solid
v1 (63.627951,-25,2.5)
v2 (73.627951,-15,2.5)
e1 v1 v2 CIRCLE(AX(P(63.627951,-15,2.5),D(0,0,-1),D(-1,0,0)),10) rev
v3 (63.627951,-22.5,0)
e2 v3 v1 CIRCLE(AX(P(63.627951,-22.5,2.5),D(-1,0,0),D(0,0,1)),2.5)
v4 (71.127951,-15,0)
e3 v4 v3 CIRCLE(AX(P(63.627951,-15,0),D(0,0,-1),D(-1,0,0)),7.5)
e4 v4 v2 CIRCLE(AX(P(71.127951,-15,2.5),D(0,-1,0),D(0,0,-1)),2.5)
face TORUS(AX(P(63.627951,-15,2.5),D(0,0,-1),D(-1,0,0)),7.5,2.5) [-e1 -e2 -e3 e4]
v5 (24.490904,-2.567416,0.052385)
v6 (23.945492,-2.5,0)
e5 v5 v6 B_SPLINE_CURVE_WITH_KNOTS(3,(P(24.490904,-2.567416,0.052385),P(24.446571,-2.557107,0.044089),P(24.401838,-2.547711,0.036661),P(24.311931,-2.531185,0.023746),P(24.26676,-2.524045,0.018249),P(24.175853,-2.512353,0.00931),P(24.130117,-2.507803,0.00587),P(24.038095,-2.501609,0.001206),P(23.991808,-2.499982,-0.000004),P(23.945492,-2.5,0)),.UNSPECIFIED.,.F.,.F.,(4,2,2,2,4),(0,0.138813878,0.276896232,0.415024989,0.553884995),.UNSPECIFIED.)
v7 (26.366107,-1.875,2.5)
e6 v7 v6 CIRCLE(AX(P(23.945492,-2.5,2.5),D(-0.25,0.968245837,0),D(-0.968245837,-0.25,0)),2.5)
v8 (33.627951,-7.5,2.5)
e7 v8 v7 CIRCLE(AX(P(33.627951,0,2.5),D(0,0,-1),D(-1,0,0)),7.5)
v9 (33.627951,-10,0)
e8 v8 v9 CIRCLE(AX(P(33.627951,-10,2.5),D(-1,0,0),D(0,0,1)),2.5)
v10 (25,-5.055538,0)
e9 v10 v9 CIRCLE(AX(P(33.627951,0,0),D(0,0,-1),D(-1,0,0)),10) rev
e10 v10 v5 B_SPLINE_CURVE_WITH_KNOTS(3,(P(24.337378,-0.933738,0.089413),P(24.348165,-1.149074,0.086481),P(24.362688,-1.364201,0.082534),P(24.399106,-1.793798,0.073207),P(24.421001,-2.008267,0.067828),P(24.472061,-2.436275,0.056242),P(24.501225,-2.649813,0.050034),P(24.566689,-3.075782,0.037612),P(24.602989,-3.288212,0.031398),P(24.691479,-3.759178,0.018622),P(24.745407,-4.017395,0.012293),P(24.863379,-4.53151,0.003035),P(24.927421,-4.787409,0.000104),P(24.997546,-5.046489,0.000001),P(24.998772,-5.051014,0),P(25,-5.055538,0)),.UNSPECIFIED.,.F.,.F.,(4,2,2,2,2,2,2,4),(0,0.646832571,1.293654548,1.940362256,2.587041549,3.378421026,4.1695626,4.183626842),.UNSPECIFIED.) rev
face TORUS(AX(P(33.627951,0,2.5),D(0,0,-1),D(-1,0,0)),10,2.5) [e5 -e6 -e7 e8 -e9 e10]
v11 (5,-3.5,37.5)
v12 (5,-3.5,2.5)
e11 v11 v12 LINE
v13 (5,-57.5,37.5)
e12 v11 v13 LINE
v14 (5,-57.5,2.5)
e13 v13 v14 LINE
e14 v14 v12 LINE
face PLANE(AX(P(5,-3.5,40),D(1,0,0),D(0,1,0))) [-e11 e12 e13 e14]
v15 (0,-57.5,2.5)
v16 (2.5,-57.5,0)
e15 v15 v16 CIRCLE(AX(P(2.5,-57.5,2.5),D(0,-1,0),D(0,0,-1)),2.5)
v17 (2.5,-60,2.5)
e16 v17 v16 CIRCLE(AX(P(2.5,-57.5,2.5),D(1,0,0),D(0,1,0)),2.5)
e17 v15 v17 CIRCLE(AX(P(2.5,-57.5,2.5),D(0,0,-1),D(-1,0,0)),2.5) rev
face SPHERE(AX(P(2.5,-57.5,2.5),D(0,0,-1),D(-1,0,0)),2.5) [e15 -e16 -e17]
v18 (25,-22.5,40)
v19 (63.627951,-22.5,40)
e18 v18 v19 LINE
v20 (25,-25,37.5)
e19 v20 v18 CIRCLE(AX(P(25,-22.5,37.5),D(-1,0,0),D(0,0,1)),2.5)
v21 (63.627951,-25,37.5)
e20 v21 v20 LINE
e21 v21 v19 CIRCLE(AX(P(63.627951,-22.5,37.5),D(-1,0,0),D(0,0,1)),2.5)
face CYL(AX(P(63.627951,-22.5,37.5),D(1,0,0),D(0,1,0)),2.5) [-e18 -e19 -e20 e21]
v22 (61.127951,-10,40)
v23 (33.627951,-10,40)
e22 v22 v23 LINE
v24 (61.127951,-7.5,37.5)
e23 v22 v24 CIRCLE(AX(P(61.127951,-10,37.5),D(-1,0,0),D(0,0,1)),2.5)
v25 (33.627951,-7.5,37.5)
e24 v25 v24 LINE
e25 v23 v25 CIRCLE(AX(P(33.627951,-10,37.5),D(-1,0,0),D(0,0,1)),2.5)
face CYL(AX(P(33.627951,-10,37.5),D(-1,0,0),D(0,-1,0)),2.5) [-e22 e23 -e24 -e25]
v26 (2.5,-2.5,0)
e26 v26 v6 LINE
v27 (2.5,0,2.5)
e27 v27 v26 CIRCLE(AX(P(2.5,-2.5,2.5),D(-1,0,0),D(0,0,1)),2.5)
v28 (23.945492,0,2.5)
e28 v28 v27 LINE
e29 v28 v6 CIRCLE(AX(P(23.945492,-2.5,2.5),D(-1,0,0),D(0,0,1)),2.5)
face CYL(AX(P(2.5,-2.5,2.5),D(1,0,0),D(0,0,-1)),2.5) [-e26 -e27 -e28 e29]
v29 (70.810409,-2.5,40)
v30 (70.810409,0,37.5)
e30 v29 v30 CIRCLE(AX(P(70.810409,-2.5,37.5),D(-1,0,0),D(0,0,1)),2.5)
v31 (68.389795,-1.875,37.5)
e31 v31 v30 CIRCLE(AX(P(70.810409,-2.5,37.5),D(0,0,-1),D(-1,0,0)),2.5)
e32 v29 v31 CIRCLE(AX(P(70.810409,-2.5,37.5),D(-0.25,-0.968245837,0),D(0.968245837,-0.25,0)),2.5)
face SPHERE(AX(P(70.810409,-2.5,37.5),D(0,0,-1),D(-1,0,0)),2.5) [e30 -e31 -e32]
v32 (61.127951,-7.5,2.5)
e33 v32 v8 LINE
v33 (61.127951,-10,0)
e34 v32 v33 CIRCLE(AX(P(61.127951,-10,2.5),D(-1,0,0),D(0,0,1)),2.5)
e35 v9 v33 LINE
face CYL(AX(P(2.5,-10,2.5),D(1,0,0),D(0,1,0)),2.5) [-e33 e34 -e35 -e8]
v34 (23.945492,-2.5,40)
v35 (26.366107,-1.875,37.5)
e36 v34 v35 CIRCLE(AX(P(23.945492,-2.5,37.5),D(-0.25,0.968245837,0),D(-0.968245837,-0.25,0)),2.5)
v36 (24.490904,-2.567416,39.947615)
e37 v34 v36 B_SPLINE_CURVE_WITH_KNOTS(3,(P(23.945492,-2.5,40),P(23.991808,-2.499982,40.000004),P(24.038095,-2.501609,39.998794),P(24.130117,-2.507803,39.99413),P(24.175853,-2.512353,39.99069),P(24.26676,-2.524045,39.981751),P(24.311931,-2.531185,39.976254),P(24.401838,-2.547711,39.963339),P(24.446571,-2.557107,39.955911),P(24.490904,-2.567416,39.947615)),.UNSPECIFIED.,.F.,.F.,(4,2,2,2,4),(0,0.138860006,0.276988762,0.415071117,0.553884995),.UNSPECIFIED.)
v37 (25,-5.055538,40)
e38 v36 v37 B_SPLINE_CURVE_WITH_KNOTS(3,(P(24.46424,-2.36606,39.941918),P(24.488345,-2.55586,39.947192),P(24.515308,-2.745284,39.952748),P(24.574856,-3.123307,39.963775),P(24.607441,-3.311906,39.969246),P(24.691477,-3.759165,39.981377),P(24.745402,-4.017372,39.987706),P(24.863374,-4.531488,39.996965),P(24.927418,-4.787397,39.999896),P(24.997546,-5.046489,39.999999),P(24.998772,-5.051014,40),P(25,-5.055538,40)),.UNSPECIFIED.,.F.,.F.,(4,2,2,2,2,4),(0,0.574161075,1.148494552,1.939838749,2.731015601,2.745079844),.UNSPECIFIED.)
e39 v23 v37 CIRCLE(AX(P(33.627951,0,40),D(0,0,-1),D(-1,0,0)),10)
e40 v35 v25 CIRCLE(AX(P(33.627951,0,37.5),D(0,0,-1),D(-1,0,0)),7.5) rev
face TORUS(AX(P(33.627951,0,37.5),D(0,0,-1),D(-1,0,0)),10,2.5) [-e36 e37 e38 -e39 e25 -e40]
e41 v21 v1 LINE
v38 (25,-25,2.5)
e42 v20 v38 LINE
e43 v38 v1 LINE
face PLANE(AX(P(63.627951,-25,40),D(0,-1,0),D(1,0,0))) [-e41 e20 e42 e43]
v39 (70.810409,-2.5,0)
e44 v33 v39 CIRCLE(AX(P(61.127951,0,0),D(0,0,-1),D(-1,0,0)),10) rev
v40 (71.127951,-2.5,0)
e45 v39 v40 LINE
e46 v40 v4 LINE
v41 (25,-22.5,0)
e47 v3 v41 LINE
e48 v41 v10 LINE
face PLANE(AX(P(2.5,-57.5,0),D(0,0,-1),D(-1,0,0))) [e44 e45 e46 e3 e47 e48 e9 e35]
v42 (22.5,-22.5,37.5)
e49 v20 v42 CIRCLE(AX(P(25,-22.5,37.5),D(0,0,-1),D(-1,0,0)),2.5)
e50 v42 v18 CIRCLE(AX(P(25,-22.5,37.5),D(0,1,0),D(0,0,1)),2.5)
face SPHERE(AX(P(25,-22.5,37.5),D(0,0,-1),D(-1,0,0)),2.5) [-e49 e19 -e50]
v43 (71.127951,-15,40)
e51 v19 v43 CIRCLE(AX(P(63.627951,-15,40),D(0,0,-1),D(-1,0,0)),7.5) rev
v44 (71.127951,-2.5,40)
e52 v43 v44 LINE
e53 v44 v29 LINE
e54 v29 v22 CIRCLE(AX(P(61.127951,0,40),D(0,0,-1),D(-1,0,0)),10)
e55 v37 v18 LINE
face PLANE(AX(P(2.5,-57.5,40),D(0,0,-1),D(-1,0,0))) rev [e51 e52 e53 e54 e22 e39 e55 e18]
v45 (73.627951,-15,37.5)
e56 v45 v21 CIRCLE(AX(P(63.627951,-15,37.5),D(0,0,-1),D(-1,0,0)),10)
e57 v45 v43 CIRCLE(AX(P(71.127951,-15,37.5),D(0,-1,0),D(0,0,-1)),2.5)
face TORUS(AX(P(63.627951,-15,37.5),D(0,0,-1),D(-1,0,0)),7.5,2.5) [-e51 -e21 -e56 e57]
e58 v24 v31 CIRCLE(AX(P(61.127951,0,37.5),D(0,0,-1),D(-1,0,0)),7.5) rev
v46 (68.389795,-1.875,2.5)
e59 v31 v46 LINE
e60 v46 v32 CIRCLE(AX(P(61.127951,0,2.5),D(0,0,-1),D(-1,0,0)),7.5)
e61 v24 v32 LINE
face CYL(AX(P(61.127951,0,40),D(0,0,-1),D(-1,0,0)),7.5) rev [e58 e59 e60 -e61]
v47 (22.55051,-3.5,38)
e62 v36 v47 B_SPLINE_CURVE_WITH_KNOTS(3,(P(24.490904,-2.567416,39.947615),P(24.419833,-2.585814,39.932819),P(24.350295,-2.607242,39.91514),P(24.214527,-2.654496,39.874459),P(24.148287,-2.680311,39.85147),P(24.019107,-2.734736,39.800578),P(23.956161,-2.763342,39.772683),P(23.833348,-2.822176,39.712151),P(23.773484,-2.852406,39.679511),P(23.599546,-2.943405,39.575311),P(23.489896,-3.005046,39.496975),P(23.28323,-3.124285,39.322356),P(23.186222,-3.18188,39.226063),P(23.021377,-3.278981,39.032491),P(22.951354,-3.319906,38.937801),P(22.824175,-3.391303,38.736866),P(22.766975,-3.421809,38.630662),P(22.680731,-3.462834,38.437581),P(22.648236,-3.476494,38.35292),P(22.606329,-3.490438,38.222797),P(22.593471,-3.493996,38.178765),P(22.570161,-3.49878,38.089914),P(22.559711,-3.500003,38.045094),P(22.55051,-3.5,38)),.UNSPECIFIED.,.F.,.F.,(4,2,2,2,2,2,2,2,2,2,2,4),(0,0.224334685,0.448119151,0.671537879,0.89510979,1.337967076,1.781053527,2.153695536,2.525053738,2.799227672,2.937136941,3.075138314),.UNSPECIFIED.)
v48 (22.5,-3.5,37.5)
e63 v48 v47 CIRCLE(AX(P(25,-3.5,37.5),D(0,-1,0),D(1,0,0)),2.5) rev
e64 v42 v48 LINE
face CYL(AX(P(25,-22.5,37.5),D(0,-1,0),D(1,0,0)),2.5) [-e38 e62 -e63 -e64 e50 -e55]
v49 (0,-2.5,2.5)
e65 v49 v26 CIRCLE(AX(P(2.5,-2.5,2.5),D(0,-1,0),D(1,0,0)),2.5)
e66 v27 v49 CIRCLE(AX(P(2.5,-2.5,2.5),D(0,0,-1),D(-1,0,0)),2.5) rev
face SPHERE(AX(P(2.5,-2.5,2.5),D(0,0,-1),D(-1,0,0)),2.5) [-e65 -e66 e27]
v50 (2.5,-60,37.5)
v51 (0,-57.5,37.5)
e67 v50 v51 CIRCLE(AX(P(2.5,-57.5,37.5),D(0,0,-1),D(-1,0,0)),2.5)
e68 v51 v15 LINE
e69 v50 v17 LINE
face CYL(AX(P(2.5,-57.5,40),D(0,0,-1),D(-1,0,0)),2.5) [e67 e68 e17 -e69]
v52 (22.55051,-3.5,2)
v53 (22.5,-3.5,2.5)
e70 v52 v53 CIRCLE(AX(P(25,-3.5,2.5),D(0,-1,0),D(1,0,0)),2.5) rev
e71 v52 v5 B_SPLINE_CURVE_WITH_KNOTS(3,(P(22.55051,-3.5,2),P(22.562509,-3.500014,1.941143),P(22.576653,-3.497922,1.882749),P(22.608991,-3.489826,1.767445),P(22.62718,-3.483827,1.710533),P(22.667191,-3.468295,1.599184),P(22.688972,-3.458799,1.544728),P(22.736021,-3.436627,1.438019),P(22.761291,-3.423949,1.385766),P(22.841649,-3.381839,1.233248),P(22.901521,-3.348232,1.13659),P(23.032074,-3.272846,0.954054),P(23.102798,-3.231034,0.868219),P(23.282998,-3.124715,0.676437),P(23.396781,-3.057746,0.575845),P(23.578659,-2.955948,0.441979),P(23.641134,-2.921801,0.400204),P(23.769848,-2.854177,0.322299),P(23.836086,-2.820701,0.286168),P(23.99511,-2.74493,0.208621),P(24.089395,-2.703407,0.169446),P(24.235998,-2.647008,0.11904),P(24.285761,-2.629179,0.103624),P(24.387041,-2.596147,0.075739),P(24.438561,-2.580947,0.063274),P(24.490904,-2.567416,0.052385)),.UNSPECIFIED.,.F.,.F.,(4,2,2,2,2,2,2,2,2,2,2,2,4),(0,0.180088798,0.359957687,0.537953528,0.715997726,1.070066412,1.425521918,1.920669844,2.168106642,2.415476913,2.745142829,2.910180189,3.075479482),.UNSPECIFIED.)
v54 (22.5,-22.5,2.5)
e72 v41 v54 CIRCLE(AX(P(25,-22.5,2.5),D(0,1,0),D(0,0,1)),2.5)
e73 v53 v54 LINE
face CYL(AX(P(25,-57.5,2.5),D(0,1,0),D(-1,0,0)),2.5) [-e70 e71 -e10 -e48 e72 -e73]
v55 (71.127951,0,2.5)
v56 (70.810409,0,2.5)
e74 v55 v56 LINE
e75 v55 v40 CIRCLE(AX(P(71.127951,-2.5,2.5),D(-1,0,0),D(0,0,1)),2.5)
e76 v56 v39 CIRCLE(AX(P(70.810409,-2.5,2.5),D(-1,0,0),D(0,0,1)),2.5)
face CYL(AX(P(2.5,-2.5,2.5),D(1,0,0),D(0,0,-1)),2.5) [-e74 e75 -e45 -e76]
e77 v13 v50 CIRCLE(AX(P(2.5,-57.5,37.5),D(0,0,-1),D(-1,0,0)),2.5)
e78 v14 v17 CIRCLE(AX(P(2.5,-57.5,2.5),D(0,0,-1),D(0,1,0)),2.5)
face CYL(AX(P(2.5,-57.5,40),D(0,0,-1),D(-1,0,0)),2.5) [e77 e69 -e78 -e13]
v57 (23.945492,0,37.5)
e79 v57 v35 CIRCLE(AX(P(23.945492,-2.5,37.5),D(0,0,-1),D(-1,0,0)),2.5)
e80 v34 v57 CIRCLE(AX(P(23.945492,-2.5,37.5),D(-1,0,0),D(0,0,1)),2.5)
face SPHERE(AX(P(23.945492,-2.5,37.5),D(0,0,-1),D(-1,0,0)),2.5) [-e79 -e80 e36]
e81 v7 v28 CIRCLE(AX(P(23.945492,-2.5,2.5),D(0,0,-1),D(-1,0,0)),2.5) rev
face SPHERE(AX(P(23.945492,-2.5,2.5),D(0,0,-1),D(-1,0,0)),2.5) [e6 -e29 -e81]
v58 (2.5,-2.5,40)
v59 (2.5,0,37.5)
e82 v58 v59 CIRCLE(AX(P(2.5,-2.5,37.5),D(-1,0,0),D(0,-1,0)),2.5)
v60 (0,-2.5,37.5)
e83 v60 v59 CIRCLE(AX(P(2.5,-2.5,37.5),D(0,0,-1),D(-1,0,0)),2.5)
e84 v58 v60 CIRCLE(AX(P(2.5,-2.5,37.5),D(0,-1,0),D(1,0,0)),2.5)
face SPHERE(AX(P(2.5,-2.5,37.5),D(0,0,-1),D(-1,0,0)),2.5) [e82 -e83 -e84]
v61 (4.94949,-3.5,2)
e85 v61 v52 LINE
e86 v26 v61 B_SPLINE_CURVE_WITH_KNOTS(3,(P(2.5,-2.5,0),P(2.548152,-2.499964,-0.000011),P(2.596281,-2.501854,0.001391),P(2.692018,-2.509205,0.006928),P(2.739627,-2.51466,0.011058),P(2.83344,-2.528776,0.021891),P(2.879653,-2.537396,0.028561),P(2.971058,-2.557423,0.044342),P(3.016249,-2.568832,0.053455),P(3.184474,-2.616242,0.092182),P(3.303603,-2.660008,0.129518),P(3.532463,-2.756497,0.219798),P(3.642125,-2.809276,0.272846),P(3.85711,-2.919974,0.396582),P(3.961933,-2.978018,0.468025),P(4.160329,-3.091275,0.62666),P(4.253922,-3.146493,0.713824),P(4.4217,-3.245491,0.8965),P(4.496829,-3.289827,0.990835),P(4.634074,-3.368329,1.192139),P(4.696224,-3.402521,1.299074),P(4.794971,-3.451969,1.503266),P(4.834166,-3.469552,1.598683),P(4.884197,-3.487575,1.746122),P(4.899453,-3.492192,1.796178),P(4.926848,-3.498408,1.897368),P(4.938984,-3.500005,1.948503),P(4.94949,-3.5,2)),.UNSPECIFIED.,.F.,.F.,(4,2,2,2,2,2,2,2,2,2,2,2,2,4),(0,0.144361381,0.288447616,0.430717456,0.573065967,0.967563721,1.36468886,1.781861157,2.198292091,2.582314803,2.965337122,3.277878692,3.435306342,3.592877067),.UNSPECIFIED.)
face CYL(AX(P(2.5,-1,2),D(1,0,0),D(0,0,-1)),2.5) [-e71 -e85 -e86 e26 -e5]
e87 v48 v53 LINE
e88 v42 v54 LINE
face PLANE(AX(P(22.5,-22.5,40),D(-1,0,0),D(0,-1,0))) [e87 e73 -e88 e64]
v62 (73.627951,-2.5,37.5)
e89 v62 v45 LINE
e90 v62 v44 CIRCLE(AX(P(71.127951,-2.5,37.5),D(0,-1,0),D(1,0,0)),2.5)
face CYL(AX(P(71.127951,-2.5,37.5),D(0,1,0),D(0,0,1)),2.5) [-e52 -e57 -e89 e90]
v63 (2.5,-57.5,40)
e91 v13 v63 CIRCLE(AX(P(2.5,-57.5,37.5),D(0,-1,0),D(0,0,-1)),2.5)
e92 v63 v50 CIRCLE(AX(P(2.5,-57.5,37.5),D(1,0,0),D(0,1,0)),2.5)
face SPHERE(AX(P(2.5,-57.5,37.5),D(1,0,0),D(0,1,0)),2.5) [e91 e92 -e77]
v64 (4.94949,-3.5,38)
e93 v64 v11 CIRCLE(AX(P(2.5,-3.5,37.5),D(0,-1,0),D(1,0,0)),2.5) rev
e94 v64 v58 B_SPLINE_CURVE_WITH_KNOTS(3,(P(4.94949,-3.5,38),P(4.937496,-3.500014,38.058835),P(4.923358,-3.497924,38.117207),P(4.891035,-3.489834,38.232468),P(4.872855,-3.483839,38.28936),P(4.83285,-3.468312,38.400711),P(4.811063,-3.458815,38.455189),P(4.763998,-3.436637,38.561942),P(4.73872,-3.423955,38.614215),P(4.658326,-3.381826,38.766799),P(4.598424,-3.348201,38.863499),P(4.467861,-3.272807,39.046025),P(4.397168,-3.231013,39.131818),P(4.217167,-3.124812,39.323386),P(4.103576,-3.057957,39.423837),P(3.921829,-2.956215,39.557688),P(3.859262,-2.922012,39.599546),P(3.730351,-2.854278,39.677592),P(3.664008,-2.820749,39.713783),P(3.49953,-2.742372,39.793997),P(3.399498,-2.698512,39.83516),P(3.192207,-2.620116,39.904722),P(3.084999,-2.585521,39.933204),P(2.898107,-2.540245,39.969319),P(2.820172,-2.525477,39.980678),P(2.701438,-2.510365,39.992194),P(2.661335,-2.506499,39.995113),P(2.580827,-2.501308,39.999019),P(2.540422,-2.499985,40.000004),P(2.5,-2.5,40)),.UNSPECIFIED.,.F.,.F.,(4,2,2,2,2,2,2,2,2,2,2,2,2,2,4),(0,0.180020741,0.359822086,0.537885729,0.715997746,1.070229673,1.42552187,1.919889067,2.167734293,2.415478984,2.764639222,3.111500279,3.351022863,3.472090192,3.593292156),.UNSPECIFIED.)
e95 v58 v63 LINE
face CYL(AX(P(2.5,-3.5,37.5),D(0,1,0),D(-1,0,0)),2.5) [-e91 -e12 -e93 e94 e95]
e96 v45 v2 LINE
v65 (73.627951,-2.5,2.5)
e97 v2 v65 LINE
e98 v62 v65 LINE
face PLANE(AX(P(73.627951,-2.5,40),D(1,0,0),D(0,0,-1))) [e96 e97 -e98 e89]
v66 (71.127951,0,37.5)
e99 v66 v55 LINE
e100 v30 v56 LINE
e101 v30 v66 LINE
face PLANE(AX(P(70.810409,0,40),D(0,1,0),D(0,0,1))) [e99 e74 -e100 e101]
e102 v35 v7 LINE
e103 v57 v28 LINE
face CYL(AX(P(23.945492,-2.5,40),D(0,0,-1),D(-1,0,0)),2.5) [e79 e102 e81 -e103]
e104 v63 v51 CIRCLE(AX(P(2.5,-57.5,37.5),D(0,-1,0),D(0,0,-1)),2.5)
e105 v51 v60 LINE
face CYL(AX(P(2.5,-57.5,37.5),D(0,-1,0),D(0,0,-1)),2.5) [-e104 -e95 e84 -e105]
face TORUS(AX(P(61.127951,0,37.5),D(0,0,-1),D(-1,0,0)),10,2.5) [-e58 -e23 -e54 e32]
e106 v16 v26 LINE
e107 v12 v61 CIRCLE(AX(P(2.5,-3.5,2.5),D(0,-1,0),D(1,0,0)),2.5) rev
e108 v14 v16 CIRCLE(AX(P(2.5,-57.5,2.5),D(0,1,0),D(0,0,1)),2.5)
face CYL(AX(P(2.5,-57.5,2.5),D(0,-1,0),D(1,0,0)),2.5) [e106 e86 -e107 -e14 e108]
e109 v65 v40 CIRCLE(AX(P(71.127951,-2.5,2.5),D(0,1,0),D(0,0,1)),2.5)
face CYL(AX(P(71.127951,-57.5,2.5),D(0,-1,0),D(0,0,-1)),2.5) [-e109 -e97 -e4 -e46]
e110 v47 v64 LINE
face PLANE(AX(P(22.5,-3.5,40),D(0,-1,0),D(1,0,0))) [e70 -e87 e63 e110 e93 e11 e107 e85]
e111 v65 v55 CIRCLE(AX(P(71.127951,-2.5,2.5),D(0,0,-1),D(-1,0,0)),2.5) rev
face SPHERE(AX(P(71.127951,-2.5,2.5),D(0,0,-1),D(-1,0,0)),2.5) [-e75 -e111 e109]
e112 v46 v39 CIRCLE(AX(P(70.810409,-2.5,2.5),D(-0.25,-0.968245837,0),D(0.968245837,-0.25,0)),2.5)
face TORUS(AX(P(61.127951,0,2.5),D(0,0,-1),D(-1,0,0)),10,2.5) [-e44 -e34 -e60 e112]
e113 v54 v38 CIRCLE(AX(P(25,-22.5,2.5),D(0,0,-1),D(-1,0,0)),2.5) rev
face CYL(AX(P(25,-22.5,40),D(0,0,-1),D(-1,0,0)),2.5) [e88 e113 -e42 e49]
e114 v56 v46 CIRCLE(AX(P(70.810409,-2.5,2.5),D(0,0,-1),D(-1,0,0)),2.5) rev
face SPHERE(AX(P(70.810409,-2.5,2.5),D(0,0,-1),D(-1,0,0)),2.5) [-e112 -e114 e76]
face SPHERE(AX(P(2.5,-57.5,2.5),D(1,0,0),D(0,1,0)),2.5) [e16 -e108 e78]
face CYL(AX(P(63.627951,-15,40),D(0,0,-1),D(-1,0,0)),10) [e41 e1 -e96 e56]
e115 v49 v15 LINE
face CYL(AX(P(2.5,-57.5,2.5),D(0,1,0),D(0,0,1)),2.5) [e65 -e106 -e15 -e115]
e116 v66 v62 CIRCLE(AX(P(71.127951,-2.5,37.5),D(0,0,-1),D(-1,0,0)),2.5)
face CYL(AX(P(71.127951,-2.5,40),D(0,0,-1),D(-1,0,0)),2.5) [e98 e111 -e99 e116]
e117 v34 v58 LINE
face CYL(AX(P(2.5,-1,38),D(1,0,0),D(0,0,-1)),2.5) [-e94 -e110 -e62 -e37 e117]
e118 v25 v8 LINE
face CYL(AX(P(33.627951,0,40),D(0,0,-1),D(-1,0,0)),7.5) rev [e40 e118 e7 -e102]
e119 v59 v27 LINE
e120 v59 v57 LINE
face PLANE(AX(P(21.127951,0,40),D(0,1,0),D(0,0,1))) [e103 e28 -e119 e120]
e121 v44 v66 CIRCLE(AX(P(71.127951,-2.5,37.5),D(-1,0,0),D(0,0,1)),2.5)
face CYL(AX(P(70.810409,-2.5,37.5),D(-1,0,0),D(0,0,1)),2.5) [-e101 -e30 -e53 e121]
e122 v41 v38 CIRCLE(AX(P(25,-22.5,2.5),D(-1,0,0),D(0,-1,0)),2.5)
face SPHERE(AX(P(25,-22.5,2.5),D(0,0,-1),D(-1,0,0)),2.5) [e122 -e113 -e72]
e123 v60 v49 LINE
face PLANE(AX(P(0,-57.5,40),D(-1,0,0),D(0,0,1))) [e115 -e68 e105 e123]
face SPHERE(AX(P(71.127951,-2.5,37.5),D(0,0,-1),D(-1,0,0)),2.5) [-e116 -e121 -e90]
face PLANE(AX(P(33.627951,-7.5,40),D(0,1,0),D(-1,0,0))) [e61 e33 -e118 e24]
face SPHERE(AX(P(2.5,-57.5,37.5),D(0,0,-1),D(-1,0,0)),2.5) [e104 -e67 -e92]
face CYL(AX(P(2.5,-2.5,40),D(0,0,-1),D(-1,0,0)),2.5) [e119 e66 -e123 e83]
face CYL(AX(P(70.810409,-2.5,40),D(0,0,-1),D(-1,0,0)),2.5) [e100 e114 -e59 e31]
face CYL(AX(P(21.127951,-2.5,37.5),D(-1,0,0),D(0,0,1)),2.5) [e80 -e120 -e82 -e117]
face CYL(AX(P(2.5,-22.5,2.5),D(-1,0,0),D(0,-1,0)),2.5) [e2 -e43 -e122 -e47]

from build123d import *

# Parameters (mm, degrees)
BOSS_EXTRUDE1_DEPTH = 40
FILLET1_R           = 2.5
FILLET2_R           = 2.5
FILLET3_R           = 2.5


with BuildPart() as part:
    # Sketch1 → Boss-Extrude1 (new body)
    with BuildSketch(Plane.XY):
        with BuildLine():
            Line((2.5000000000000173, 0), (21.127950813884276, 0))
            Line((21.127950813884276, 0), (23.945492448365734, 0))
            ThreePointArc((23.945492448365734, 0), (25.47642353760522, -0.5235764623947627), (26.36610703974537, -1.8749999999999996))
            ThreePointArc((26.36610703974537, -1.8749999999999996), (29.035157546165816, -5.92927061281571), (33.627950813884276, -7.5))
            Line((33.627950813884276, -7.5), (61.1279508138843, -7.499999999999999))
            ThreePointArc((61.1279508138843, -7.499999999999999), (65.72074408160276, -5.92927061281571), (68.38979458802321, -1.874999999999998))
            ThreePointArc((68.38979458802321, -1.874999999999998), (69.27947809016335, -0.5235764623947716), (70.81040917940282, 0))
            Line((70.81040917940282, 0), (71.12795081388428, 0))
            ThreePointArc((71.12795081388428, 0), (72.89571776685065, -0.7322330470336298), (73.6279508138843, -2.499999999999995))
            Line((73.6279508138843, -2.499999999999995), (73.6279508138843, -15.000000000000004))
            ThreePointArc((73.6279508138843, -15.000000000000004), (70.69901862574977, -22.07106781186548), (63.6279508138843, -25.000000000000004))
            Line((63.6279508138843, -25.000000000000004), (25.00000000000001, -25.000000000000007))
            ThreePointArc((25.00000000000001, -25.000000000000007), (23.232233047033624, -24.267766952966376), (22.499999999999993, -22.49999999999999))
            Line((22.499999999999993, -22.49999999999999), (22.500000000000004, -3.4999999999999987))
            Line((22.500000000000004, -3.4999999999999987), (4.999999999999997, -3.499999999999996))
            Line((4.999999999999997, -3.499999999999996), (4.999999999999999, -60))
            Line((4.999999999999999, -60), (2.5000000000000178, -60))
            ThreePointArc((2.5000000000000178, -60), (0.7322330470336276, -59.26776695296637), (0, -57.49999999999998))
            Line((0, -57.49999999999998), (0, -2.5000000000000178))
            ThreePointArc((0, -2.5000000000000178), (0.7322330470336309, -0.7322330470336311), (2.5000000000000173, 0))
        make_face()
    extrude(amount=BOSS_EXTRUDE1_DEPTH)

    # Fillet1
    # the kernel refuses this fillet: 2.5 mm, written as the material it takes off along each edge
    with BuildSketch(Plane(origin=(11.25, -60, 40), x_dir=(0, 1, 0), z_dir=(-1, 0, 0))) as fillet1_piece_1:
        with BuildLine():
            CenterArc((FILLET1_R, FILLET1_R), FILLET1_R, 180, 90)
            Line((0, FILLET1_R), (0, 0))
            Line((0, 0), (FILLET1_R, 0))
        make_face()
    extrude(amount=8.749999999999982, mode=Mode.SUBTRACT)
    with BuildSketch(Plane(origin=(24.99999999999999, -22.50000000000001, 0), x_dir=(8.53e-15, -1, 0), z_dir=(1, 8.53e-15, 0))) as fillet1_piece_2:
        with BuildLine():
            CenterArc((2.4999999999999964 - FILLET1_R, -FILLET1_R), FILLET1_R, 0, 90)
            Line((2.4999999999999964 - FILLET1_R, 4.4e-16), (2.4999999999999964, 0))
            Line((2.4999999999999964, 0), (2.4999999999999964, -FILLET1_R))
        make_face()
    revolve(axis=Axis((24.99999999999999, -22.50000000000001, 0), (0, 0, -1)), revolution_arc=90.00000000000098, mode=Mode.SUBTRACT)
    with BuildSketch(Plane(origin=(63.6279508138843, -25.000000000000004, 0), x_dir=(0, 0, 1), z_dir=(-1, -9e-17, 0))) as fillet1_piece_3:
        with BuildLine():
            CenterArc((FILLET1_R, FILLET1_R), FILLET1_R, 180, 90)
            Line((-4.4e-16, FILLET1_R), (0, 0))
            Line((0, 0), (FILLET1_R, 0))
        make_face()
    extrude(amount=38.62795081388428, mode=Mode.SUBTRACT)
    with BuildSketch(Plane(origin=(63.6279508138843, -15.000000000000005, 0), x_dir=(1, 1.8e-16, 0), z_dir=(-1.8e-16, 1, 0))) as fillet1_piece_4:
        with BuildLine():
            CenterArc((10 - FILLET1_R, -FILLET1_R), FILLET1_R, 0, 90)
            Line((10 - FILLET1_R, 4.4e-16), (10, 0))
            Line((10, 0), (10, -FILLET1_R))
        make_face()
    revolve(axis=Axis((63.6279508138843, -15.000000000000005, 0), (0, 0, -1)), revolution_arc=90.00000000000001, mode=Mode.SUBTRACT)
    with BuildSketch(Plane(origin=(73.6279508138843, -2.4999999999999947, 0), x_dir=(0, 0, 1), z_dir=(0, -1, 0))) as fillet1_piece_5:
        with BuildLine():
            CenterArc((FILLET1_R, FILLET1_R), FILLET1_R, 180, 90)
            Line((-4.4e-16, FILLET1_R), (0, 0))
            Line((0, 0), (FILLET1_R, 0))
        make_face()
    extrude(amount=12.500000000000009, mode=Mode.SUBTRACT)
    with BuildSketch(Plane(origin=(2.499999999999992, -57.50000000000001, 40), x_dir=(1.03e-14, -1, 0), z_dir=(1, 1.03e-14, 0))) as fillet1_piece_6:
        with BuildLine():
            CenterArc((2.499999999999993 - FILLET1_R, FILLET1_R), FILLET1_R, 270, 90)
            Line((2.499999999999993, FILLET1_R), (2.499999999999993, 0))
            Line((2.499999999999993, 0), (2.499999999999993 - FILLET1_R, 0))
        make_face()
    revolve(axis=Axis((2.499999999999992, -57.50000000000001, 40), (0, 0, -1)), revolution_arc=90.00000000000125, mode=Mode.SUBTRACT)
    with BuildSketch(Plane(origin=(71.12795081388427, -2.500000000000025, 0), x_dir=(5.68e-15, 1, 0), z_dir=(-1, 5.68e-15, 0))) as fillet1_piece_7:
        with BuildLine():
            CenterArc((2.5000000000000275 - FILLET1_R, -FILLET1_R), FILLET1_R, 0, 90.00000000000003)
            Line((2.5000000000000275 - FILLET1_R, 4.4e-16), (2.5000000000000275, 0))
            Line((2.5000000000000275, 0), (2.500000000000031, -FILLET1_R))
        make_face()
    revolve(axis=Axis((71.12795081388427, -2.500000000000025, 0), (0, 0, -1)), revolution_arc=89.99999999999899, mode=Mode.SUBTRACT)
    with BuildSketch(Plane(origin=(70.81040917940282, 0, 0), x_dir=(0, 0, 1), z_dir=(1, 0, 0))) as fillet1_piece_8:
        with BuildLine():
            CenterArc((FILLET1_R, FILLET1_R), FILLET1_R, 180, 90)
            Line((-4.4e-16, FILLET1_R), (0, 0))
            Line((0, 0), (FILLET1_R, 0))
        make_face()
    extrude(amount=0.3175416344814579, mode=Mode.SUBTRACT)
    with BuildSketch(Plane(origin=(70.81040917940287, -2.500000000000021, 0), x_dir=(-0.9682458365518528, 0.2500000000000059, 0), z_dir=(-0.2500000000000059, -0.9682458365518528, 0))) as fillet1_piece_9:
        with BuildLine():
            CenterArc((2.5000000000000293 - FILLET1_R, -FILLET1_R), FILLET1_R, 0, 89.99999999999999)
            Line((2.5000000000000293 - FILLET1_R, 4.4e-16), (2.5000000000000293, 0))
            Line((2.5000000000000293, 0), (2.5000000000000284, -FILLET1_R))
        make_face()
    revolve(axis=Axis((70.81040917940287, -2.500000000000021, 0), (0, 0, -1)), revolution_arc=75.52248781406874, mode=Mode.SUBTRACT)
    with BuildSketch(Plane(origin=(61.127950813884304, -6.66e-15, 0), x_dir=(-9.5e-16, -1, 0), z_dir=(-1, 9.5e-16, 0))) as fillet1_piece_10:
        with BuildLine():
            CenterArc((7.499999999999993 + FILLET1_R, FILLET1_R), FILLET1_R, 180, 89.99999999999994)
            Line((7.499999999999993 + FILLET1_R, -4.4e-16), (7.499999999999993, 0))
            Line((7.499999999999993, 0), (7.4999999999999964, FILLET1_R))
        make_face()
    revolve(axis=Axis((61.127950813884304, -6.66e-15, 0), (0, 0, 1)), revolution_arc=75.52248781407019, mode=Mode.SUBTRACT)
    with BuildSketch(Plane(origin=(33.627950813884276, -7.5, 0), x_dir=(0, 0, 1), z_dir=(1, 3e-17, 0))) as fillet1_piece_11:
        with BuildLine():
            CenterArc((FILLET1_R, FILLET1_R), FILLET1_R, 180, 90)
            Line((-4.4e-16, FILLET1_R), (0, 0))
            Line((0, 0), (FILLET1_R, 0))
        make_face()
    extrude(amount=27.50000000000002, mode=Mode.SUBTRACT)
    with BuildSketch(Plane(origin=(33.627950813884276, 3.55e-15, 0), x_dir=(-0.9682458365518541, -0.25000000000000033, 0), z_dir=(-0.25000000000000033, 0.9682458365518541, 0))) as fillet1_piece_12:
        with BuildLine():
            CenterArc((7.500000000000004 + FILLET1_R, FILLET1_R), FILLET1_R, 180, 89.99999999999994)
            Line((7.500000000000004 + FILLET1_R, -4.4e-16), (7.500000000000004, 0))
            Line((7.500000000000004, 0), (7.500000000000002, FILLET1_R))
        make_face()
    revolve(axis=Axis((33.627950813884276, 3.55e-15, 0), (0, 0, 1)), revolution_arc=75.52248781407005, mode=Mode.SUBTRACT)
    with BuildSketch(Plane(origin=(23.945492448365737, -2.499999999999996, 0), x_dir=(-1.42e-15, 1, 0), z_dir=(-1, -1.42e-15, 0))) as fillet1_piece_13:
        with BuildLine():
            CenterArc((2.499999999999996 - FILLET1_R, -FILLET1_R), FILLET1_R, 0, 90.00000000000003)
            Line((2.499999999999996 - FILLET1_R, 4.4e-16), (2.499999999999996, 0))
            Line((2.499999999999996, 0), (2.4999999999999956, -FILLET1_R))
        make_face()
    revolve(axis=Axis((23.945492448365737, -2.499999999999996, 0), (0, 0, -1)), revolution_arc=75.52248781407022, mode=Mode.SUBTRACT)
    with BuildSketch(Plane(origin=(23.945492448365734, -2.2e-16, 0), x_dir=(0, 4e-17, 1), z_dir=(-1, 1e-17, 0))) as fillet1_piece_14:
        with BuildLine():
            CenterArc((FILLET1_R, -FILLET1_R), FILLET1_R, 90, 90)
            Line((-5.6e-16, -FILLET1_R), (0, 0))
            Line((0, 0), (FILLET1_R, 0))
        make_face()
    extrude(amount=21.445492448365716, mode=Mode.SUBTRACT)
    with BuildSketch(Plane(origin=(2.499999999999999, -2.499999999999999, 0), x_dir=(-1, -7.46e-15, 0), z_dir=(7.46e-15, -1, 0))) as fillet1_piece_15:
        with BuildLine():
            CenterArc((2.499999999999999 - FILLET1_R, -FILLET1_R), FILLET1_R, 1.018e-14, 90)
            Line((2.4999999999999987, -FILLET1_R), (2.499999999999999, 0))
            Line((2.499999999999999, 0), (2.499999999999999 - FILLET1_R, 0))
        make_face()
    revolve(axis=Axis((2.499999999999999, -2.499999999999999, 0), (0, 0, -1)), revolution_arc=90.00000000000085, mode=Mode.SUBTRACT)
    with BuildSketch(Plane(origin=(0, -57.49999999999998, 40), x_dir=(0, 0, -1), z_dir=(0, 1, 0))) as fillet1_piece_16:
        with BuildLine():
            CenterArc((FILLET1_R, -FILLET1_R), FILLET1_R, 90, 90)
            Line((0, -FILLET1_R), (0, 0))
            Line((0, 0), (FILLET1_R, 0))
        make_face()
    extrude(amount=54.99999999999996, mode=Mode.SUBTRACT)
    with BuildSketch(Plane(origin=(0, -57.49999999999998, 0), x_dir=(0, 0, 1), z_dir=(0, 1, 0))) as fillet1_piece_17:
        with BuildLine():
            CenterArc((FILLET1_R, FILLET1_R), FILLET1_R, 180, 90)
            Line((-4.4e-16, FILLET1_R), (0, 0))
            Line((0, 0), (FILLET1_R, 0))
        make_face()
    extrude(amount=54.99999999999996, mode=Mode.SUBTRACT)
    with BuildSketch(Plane(origin=(2.499999999999992, -57.50000000000001, 0), x_dir=(1.03e-14, -1, 0), z_dir=(1, 1.03e-14, 0))) as fillet1_piece_18:
        with BuildLine():
            CenterArc((2.499999999999993 - FILLET1_R, -FILLET1_R), FILLET1_R, 1.018e-14, 90)
            Line((2.499999999999993, -FILLET1_R), (2.499999999999993, 0))
            Line((2.499999999999993, 0), (2.499999999999993 - FILLET1_R, 0))
        make_face()
    revolve(axis=Axis((2.499999999999992, -57.50000000000001, 0), (0, 0, -1)), revolution_arc=90.00000000000125, mode=Mode.SUBTRACT)
    with BuildSketch(Plane(origin=(11.25, -60, 0), x_dir=(0, 0, 1), z_dir=(-1, 0, 0))) as fillet1_piece_19:
        with BuildLine():
            CenterArc((FILLET1_R, FILLET1_R), FILLET1_R, 180, 90)
            Line((-4.4e-16, FILLET1_R), (0, 0))
            Line((0, 0), (FILLET1_R, 0))
        make_face()
    extrude(amount=8.749999999999982, mode=Mode.SUBTRACT)
    with BuildSketch(Plane(origin=(22.499999999999993, -22.49999999999999, 0), x_dir=(-1.42e-15, 0, 1), z_dir=(5.6e-16, 1, 0))) as fillet1_piece_20:
        with BuildLine():
            CenterArc((FILLET1_R, FILLET1_R), FILLET1_R, 180, 90.00000000000006)
            Line((-4e-15, FILLET1_R), (0, 0))
            Line((0, 0), (FILLET1_R, 0))
        make_face()
    extrude(amount=18.99999999999999, mode=Mode.SUBTRACT)
    with BuildSketch(Plane(origin=(2.499999999999999, -2.499999999999999, 40), x_dir=(-1, -7.46e-15, 0), z_dir=(7.46e-15, -1, 0))) as fillet1_piece_21:
        with BuildLine():
            CenterArc((2.499999999999999 - FILLET1_R, FILLET1_R), FILLET1_R, 270, 90)
            Line((2.4999999999999987, FILLET1_R), (2.499999999999999, 0))
            Line((2.499999999999999, 0), (2.499999999999999 - FILLET1_R, 0))
        make_face()
    revolve(axis=Axis((2.499999999999999, -2.499999999999999, 40), (0, 0, -1)), revolution_arc=90.00000000000085, mode=Mode.SUBTRACT)
    with BuildSketch(Plane(origin=(2.5000000000000178, 0, 40), x_dir=(-1e-17, -1, 0), z_dir=(1, -1e-17, 0))) as fillet1_piece_22:
        with BuildLine():
            CenterArc((FILLET1_R, FILLET1_R), FILLET1_R, 180, 90)
            Line((-1.1e-16, FILLET1_R), (0, 0))
            Line((0, 0), (FILLET1_R, 0))
        make_face()
    extrude(amount=21.445492448365716, mode=Mode.SUBTRACT)
    with BuildSketch(Plane(origin=(23.945492448365737, -2.499999999999996, 40), x_dir=(-1.42e-15, 1, 0), z_dir=(-1, -1.42e-15, 0))) as fillet1_piece_23:
        with BuildLine():
            CenterArc((2.499999999999996 - FILLET1_R, FILLET1_R), FILLET1_R, 270, 90)
            Line((2.499999999999995, FILLET1_R), (2.499999999999996, 0))
            Line((2.499999999999996, 0), (2.499999999999996 - FILLET1_R, 0))
        make_face()
    revolve(axis=Axis((23.945492448365737, -2.499999999999996, 40), (0, 0, -1)), revolution_arc=75.52248781407022, mode=Mode.SUBTRACT)
    with BuildSketch(Plane(origin=(33.627950813884276, 3.55e-15, 40), x_dir=(-0.9682458365518541, -0.25000000000000033, 0), z_dir=(-0.25000000000000033, 0.9682458365518541, 0))) as fillet1_piece_24:
        with BuildLine():
            CenterArc((7.500000000000004 + FILLET1_R, -FILLET1_R), FILLET1_R, 90, 90)
            Line((7.500000000000002, -FILLET1_R), (7.500000000000004, 0))
            Line((7.500000000000004, 0), (7.500000000000004 + FILLET1_R, 0))
        make_face()
    revolve(axis=Axis((33.627950813884276, 3.55e-15, 40), (0, 0, 1)), revolution_arc=75.52248781407005, mode=Mode.SUBTRACT)
    with BuildSketch(Plane(origin=(33.627950813884276, -7.5, 40), x_dir=(3e-17, -1, 0), z_dir=(1, 3e-17, 0))) as fillet1_piece_25:
        with BuildLine():
            CenterArc((FILLET1_R, FILLET1_R), FILLET1_R, 180, 90)
            Line((0, FILLET1_R), (0, 0))
            Line((0, 0), (FILLET1_R, 0))
        make_face()
    extrude(amount=27.50000000000002, mode=Mode.SUBTRACT)
    with BuildSketch(Plane(origin=(22.499999999999993, -22.49999999999999, 40), x_dir=(1, -5.6e-16, 0), z_dir=(5.6e-16, 1, 0))) as fillet1_piece_26:
        with BuildLine():
            CenterArc((FILLET1_R, FILLET1_R), FILLET1_R, 180, 90)
            Line((0, FILLET1_R), (0, 0))
            Line((0, 0), (FILLET1_R, 0))
        make_face()
    extrude(amount=18.99999999999999, mode=Mode.SUBTRACT)
    with BuildSketch(Plane(origin=(61.127950813884304, -6.66e-15, 40), x_dir=(-9.5e-16, -1, 0), z_dir=(-1, 9.5e-16, 0))) as fillet1_piece_27:
        with BuildLine():
            CenterArc((7.499999999999993 + FILLET1_R, -FILLET1_R), FILLET1_R, 90, 90)
            Line((7.499999999999995, -FILLET1_R), (7.499999999999993, 0))
            Line((7.499999999999993, 0), (7.499999999999993 + FILLET1_R, 0))
        make_face()
    revolve(axis=Axis((61.127950813884304, -6.66e-15, 40), (0, 0, 1)), revolution_arc=75.52248781407019, mode=Mode.SUBTRACT)
    with BuildSketch(Plane(origin=(70.81040917940287, -2.500000000000021, 40), x_dir=(-0.9682458365518528, 0.2500000000000059, 0), z_dir=(-0.2500000000000059, -0.9682458365518528, 0))) as fillet1_piece_28:
        with BuildLine():
            CenterArc((2.5000000000000293 - FILLET1_R, FILLET1_R), FILLET1_R, 270, 90)
            Line((2.500000000000029, FILLET1_R), (2.5000000000000293, 0))
            Line((2.5000000000000293, 0), (2.5000000000000293 - FILLET1_R, 0))
        make_face()
    revolve(axis=Axis((70.81040917940287, -2.500000000000021, 40), (0, 0, -1)), revolution_arc=75.52248781406874, mode=Mode.SUBTRACT)
    with BuildSketch(Plane(origin=(70.81040917940282, 0, 40), x_dir=(0, -1, 0), z_dir=(1, 0, 0))) as fillet1_piece_29:
        with BuildLine():
            CenterArc((FILLET1_R, FILLET1_R), FILLET1_R, 180, 90)
            Line((0, FILLET1_R), (0, 0))
            Line((0, 0), (FILLET1_R, 0))
        make_face()
    extrude(amount=0.3175416344814579, mode=Mode.SUBTRACT)
    with BuildSketch(Plane(origin=(71.12795081388427, -2.500000000000025, 40), x_dir=(5.68e-15, 1, 0), z_dir=(-1, 5.68e-15, 0))) as fillet1_piece_30:
        with BuildLine():
            CenterArc((2.5000000000000275 - FILLET1_R, FILLET1_R), FILLET1_R, 270, 90)
            Line((2.500000000000031, FILLET1_R), (2.5000000000000275, 0))
            Line((2.5000000000000275, 0), (2.5000000000000275 - FILLET1_R, 0))
        make_face()
    revolve(axis=Axis((71.12795081388427, -2.500000000000025, 40), (0, 0, -1)), revolution_arc=89.99999999999899, mode=Mode.SUBTRACT)
    with BuildSketch(Plane(origin=(73.6279508138843, -2.4999999999999947, 40), x_dir=(-1, 0, 0), z_dir=(0, -1, 0))) as fillet1_piece_31:
        with BuildLine():
            CenterArc((FILLET1_R, FILLET1_R), FILLET1_R, 180, 90)
            Line((0, FILLET1_R), (0, 0))
            Line((0, 0), (FILLET1_R, 0))
        make_face()
    extrude(amount=12.500000000000009, mode=Mode.SUBTRACT)
    with BuildSketch(Plane(origin=(63.6279508138843, -15.000000000000005, 40), x_dir=(1, 1.8e-16, 0), z_dir=(-1.8e-16, 1, 0))) as fillet1_piece_32:
        with BuildLine():
            CenterArc((10 - FILLET1_R, FILLET1_R), FILLET1_R, 270, 90)
            Line((10, FILLET1_R), (10, 0))
            Line((10, 0), (10 - FILLET1_R, 0))
        make_face()
    revolve(axis=Axis((63.6279508138843, -15.000000000000005, 40), (0, 0, -1)), revolution_arc=90.00000000000001, mode=Mode.SUBTRACT)
    with BuildSketch(Plane(origin=(63.6279508138843, -25.000000000000004, 40), x_dir=(-9e-17, 1, 0), z_dir=(-1, -9e-17, 0))) as fillet1_piece_33:
        with BuildLine():
            CenterArc((FILLET1_R, FILLET1_R), FILLET1_R, 180, 90)
            Line((0, FILLET1_R), (0, 0))
            Line((0, 0), (FILLET1_R, 0))
        make_face()
    extrude(amount=38.62795081388428, mode=Mode.SUBTRACT)
    with BuildSketch(Plane(origin=(24.99999999999999, -22.50000000000001, 40), x_dir=(8.53e-15, -1, 0), z_dir=(1, 8.53e-15, 0))) as fillet1_piece_34:
        with BuildLine():
            CenterArc((2.4999999999999964 - FILLET1_R, FILLET1_R), FILLET1_R, 270, 90)
            Line((2.4999999999999964, FILLET1_R), (2.4999999999999964, 0))
            Line((2.4999999999999964, 0), (2.4999999999999964 - FILLET1_R, 0))
        make_face()
    revolve(axis=Axis((24.99999999999999, -22.50000000000001, 40), (0, 0, -1)), revolution_arc=90.00000000000098, mode=Mode.SUBTRACT)

    # Fillet2
    # the kernel refuses this fillet: 2.5 mm, written as the material it takes off along each edge
    with BuildSketch(Plane(origin=(4.999999999999997, -3.4999999999999964, 0), x_dir=(-1, -3e-17, 0), z_dir=(3e-17, -1, 0))) as fillet2_piece_1:
        with BuildLine():
            CenterArc((FILLET2_R, -FILLET2_R), FILLET2_R, 90, 90)
            Line((-1.78e-15, -FILLET2_R), (-FILLET2_R * 0.02, -FILLET2_R))
            Line((-FILLET2_R * 0.02, -FILLET2_R), (-FILLET2_R * 0.02, FILLET2_R * 0.02))
            Line((-FILLET2_R * 0.02, FILLET2_R * 0.02), (FILLET2_R, FILLET2_R * 0.02))
            Line((FILLET2_R, FILLET2_R * 0.02), (FILLET2_R, 0))
        make_face()
    extrude(amount=54.00000000000001, mode=Mode.SUBTRACT)
    with BuildSketch(Plane(origin=(4.999999999999999, -57.5, 2.5), x_dir=(0, -1, -1.8e-16), z_dir=(0, -1.8e-16, 1))) as fillet2_piece_2:
        with BuildLine():
            CenterArc((2.5 - FILLET2_R, -FILLET2_R), FILLET2_R, 2.036e-14, 90)
            Line((2.5, -FILLET2_R), (2.5 + FILLET2_R * 0.02, -FILLET2_R))
            Line((2.5 + FILLET2_R * 0.02, -FILLET2_R), (2.5 + FILLET2_R * 0.02, FILLET2_R * 0.02))
            Line((2.5 + FILLET2_R * 0.02, FILLET2_R * 0.02), (2.5 - FILLET2_R, FILLET2_R * 0.02))
            Line((2.5 - FILLET2_R, FILLET2_R * 0.02), (2.5 - FILLET2_R, 0))
        make_face()
    revolve(axis=Axis((4.999999999999999, -57.5, 2.5), (1, 0, 0)), revolution_arc=89.99999999999999, mode=Mode.SUBTRACT)
    with BuildSketch(Plane(origin=(4.999999999999999, -60, 2.5), x_dir=(-1, 0, 0), z_dir=(0, 0, 1))) as fillet2_piece_3:
        with BuildLine():
            CenterArc((FILLET2_R, -FILLET2_R), FILLET2_R, 90, 90)
            Line((-8.9e-16, -FILLET2_R), (-FILLET2_R * 0.02, -FILLET2_R))
            Line((-FILLET2_R * 0.02, -FILLET2_R), (-FILLET2_R * 0.02, FILLET2_R * 0.02))
            Line((-FILLET2_R * 0.02, FILLET2_R * 0.02), (FILLET2_R, FILLET2_R * 0.02))
            Line((FILLET2_R, FILLET2_R * 0.02), (FILLET2_R, 0))
        make_face()
    extrude(amount=35, mode=Mode.SUBTRACT)
    with BuildSketch(Plane(origin=(4.999999999999999, -57.5, 37.5), x_dir=(0, 0, 1), z_dir=(0, 1, 0))) as fillet2_piece_4:
        with BuildLine():
            CenterArc((2.5 - FILLET2_R, -FILLET2_R), FILLET2_R, 2.036e-14, 90)
            Line((2.5, -FILLET2_R), (2.5 + FILLET2_R * 0.02, -FILLET2_R))
            Line((2.5 + FILLET2_R * 0.02, -FILLET2_R), (2.5 + FILLET2_R * 0.02, FILLET2_R * 0.02))
            Line((2.5 + FILLET2_R * 0.02, FILLET2_R * 0.02), (2.5 - FILLET2_R, FILLET2_R * 0.02))
            Line((2.5 - FILLET2_R, FILLET2_R * 0.02), (2.5 - FILLET2_R, 0))
        make_face()
    revolve(axis=Axis((4.999999999999999, -57.5, 37.5), (1, 0, 0)), revolution_arc=90, mode=Mode.SUBTRACT)
    with BuildSketch(Plane(origin=(4.9999999999999964, -3.499999999999996, 40), x_dir=(2e-16, 1, 0), z_dir=(1, -2e-16, 0))) as fillet2_piece_5_section:
        with BuildLine():
            CenterArc((2.5000000000000004, -2), FILLET2_R, 126.86989764584406, 53.13010235415594)
            Line((4.4e-16, -2), (-0.04999999999999938, -2))
            Line((-0.04999999999999938, -2), (-0.04999999999999982, 0))
            Line((-0.04999999999999982, 0), (0, 0.04999999999999716))
            ThreePointArc((0, 0.04999999999999716), (0.5000000000000013, 0.04999999999999716), (0.9699999999999984, 0.03999999999999915))
            Line((0.9699999999999984, 0.03999999999999915), (0.9999999999999987, 0))
        make_face()
    fillet2_piece_5 = extrude(amount=24.26045381628627, mode=Mode.PRIVATE)
    fillet2_piece_5 = fillet2_piece_5 - Plane(origin=(25, -3.499999999999996, 37.5), x_dir=(1, 0, 0), z_dir=(0, -1, 0)) * Cylinder(2.5, 57, mode=Mode.PRIVATE)
    add(fillet2_piece_5, mode=Mode.SUBTRACT)
    with BuildSketch(Plane(origin=(4.999999999999997, -3.4999999999999964, 40), x_dir=(-1, -3e-17, 0), z_dir=(3e-17, -1, 0))) as fillet2_piece_6:
        with BuildLine():
            CenterArc((FILLET2_R, FILLET2_R), FILLET2_R, 180, 90)
            Line((-1.78e-15, FILLET2_R), (-FILLET2_R * 0.02, FILLET2_R))
            Line((-FILLET2_R * 0.02, FILLET2_R), (-FILLET2_R * 0.02, -FILLET2_R * 0.02))
            Line((-FILLET2_R * 0.02, -FILLET2_R * 0.02), (FILLET2_R, -FILLET2_R * 0.02))
            Line((FILLET2_R, -FILLET2_R * 0.02), (FILLET2_R, 0))
        make_face()
    extrude(amount=54.00000000000001, mode=Mode.SUBTRACT)
    with BuildSketch(Plane(origin=(4.999999999999997, 2.750000000000007, 40), x_dir=(-1, -3e-17, 0), z_dir=(3e-17, -1, 0))) as fillet2_piece_7a_section:
        with BuildLine():
            CenterArc((FILLET2_R, FILLET2_R), FILLET2_R, 180, 90)
            Line((-1.78e-15, FILLET2_R), (-FILLET2_R * 0.02, FILLET2_R))
            Line((-FILLET2_R * 0.02, FILLET2_R), (-FILLET2_R * 0.02, -FILLET2_R * 0.02))
            Line((-FILLET2_R * 0.02, -FILLET2_R * 0.02), (FILLET2_R, -FILLET2_R * 0.02))
            Line((FILLET2_R, -FILLET2_R * 0.02), (FILLET2_R, 0))
        make_face()
    fillet2_piece_7a = extrude(amount=60.25000000000001, mode=Mode.PRIVATE)
    fillet2_piece_7a = split(fillet2_piece_7a, bisect_by=Plane(origin=(4.9999999999999964, -3.4999999999999964, 40), z_dir=(1.5e-16, 1, 0)), keep=Keep.TOP, mode=Mode.PRIVATE)
    with BuildSketch(Plane(origin=(-1.78e-15, -3.499999999999995, 40), x_dir=(2e-16, 1, 0), z_dir=(1, -2e-16, 0))) as fillet2_piece_7b_section:
        with BuildLine():
            CenterArc((2.5000000000000004, -2), FILLET2_R, 126.86989764584406, 53.13010235415594)
            Line((4.4e-16, -2), (-0.04999999999999938, -2))
            Line((-0.04999999999999938, -2), (-0.04999999999999982, 0))
            Line((-0.04999999999999982, 0), (0, 0.04999999999999716))
            ThreePointArc((0, 0.04999999999999716), (0.5000000000000013, 0.04999999999999716), (0.9699999999999984, 0.03999999999999915))
            Line((0.9699999999999984, 0.03999999999999915), (0.9999999999999987, 0))
        make_face()
    fillet2_piece_7b = extrude(amount=29.260453816286265, mode=Mode.PRIVATE)
    fillet2_piece_7b = split(fillet2_piece_7b, bisect_by=Plane(origin=(4.999999999999997, -3.499999999999995, 40), z_dir=(-1, -3e-17, 0)), keep=Keep.TOP, mode=Mode.PRIVATE)
    fillet2_piece_7 = fillet2_piece_7a & fillet2_piece_7b
    add(fillet2_piece_7, mode=Mode.SUBTRACT)

    # Fillet3
    # the kernel refuses this fillet: 2.5 mm, written as the material it takes off along each edge
    with BuildSketch(Plane(origin=(29.26045381628626, -3.4999999999997757, 0), x_dir=(-9.08e-15, 1, 0), z_dir=(-1, -9.08e-15, 0))) as fillet3_piece_1_section:
        with BuildLine():
            CenterArc((2.4999999999999107, -1.9999999999999982), FILLET3_R, 126.86989764584409, 53.13010235415591)
            Line((-8.926e-14, -1.9999999999999982), (0, 0))
            Line((0, 0), (0.9999999999999081, 0))
        make_face()
    fillet3_piece_1 = extrude(amount=24.21045381628626, mode=Mode.PRIVATE)
    fillet3_piece_1 = fillet3_piece_1 - Plane(origin=(25, -3.4999999999997757, 2.5), x_dir=(0, 0, 1), z_dir=(0, -1, 0)) * Cylinder(2.5, 57, mode=Mode.PRIVATE)
    add(fillet3_piece_1, mode=Mode.SUBTRACT)
    with BuildSketch(Plane(origin=(5.050000000000001, -3.4999999999999956, 0), x_dir=(-9.08e-15, 1, -2.2e-16), z_dir=(-1, -9.08e-15, 0))) as fillet3_piece_2:
        with BuildLine():
            CenterArc((2.499999999999999, -1.9999999999999973), FILLET3_R, 126.86989764584412, 53.13010235415588)
            Line((-8.9e-16, -1.9999999999999967), (0, 0))
            Line((0, 0), (0.9999999999999956, 0))
        make_face()
    extrude(amount=0.05000000000000426, mode=Mode.SUBTRACT)
    with BuildSketch(Plane(origin=(-2.4999999999999982, -3.5, 0), x_dir=(0, 1, 0), z_dir=(1, 0, 0))) as fillet3_piece_3_section:
        with BuildLine():
            CenterArc((2.5, 2), FILLET3_R, 180, 53.13010235415595)
            Line((0, 2), (0, 0))
            Line((0, 0), (1, 0))
        make_face()
    fillet3_piece_3 = extrude(amount=7.4999999999999964, mode=Mode.PRIVATE)
    fillet3_piece_3 = fillet3_piece_3 - Plane(origin=(2.5, -3.5, 2.5), x_dir=(0, 0, 1), z_dir=(0, -1, 0)) * Cylinder(2.5, 23, mode=Mode.PRIVATE)
    add(fillet3_piece_3, mode=Mode.SUBTRACT)


solid = part.part
